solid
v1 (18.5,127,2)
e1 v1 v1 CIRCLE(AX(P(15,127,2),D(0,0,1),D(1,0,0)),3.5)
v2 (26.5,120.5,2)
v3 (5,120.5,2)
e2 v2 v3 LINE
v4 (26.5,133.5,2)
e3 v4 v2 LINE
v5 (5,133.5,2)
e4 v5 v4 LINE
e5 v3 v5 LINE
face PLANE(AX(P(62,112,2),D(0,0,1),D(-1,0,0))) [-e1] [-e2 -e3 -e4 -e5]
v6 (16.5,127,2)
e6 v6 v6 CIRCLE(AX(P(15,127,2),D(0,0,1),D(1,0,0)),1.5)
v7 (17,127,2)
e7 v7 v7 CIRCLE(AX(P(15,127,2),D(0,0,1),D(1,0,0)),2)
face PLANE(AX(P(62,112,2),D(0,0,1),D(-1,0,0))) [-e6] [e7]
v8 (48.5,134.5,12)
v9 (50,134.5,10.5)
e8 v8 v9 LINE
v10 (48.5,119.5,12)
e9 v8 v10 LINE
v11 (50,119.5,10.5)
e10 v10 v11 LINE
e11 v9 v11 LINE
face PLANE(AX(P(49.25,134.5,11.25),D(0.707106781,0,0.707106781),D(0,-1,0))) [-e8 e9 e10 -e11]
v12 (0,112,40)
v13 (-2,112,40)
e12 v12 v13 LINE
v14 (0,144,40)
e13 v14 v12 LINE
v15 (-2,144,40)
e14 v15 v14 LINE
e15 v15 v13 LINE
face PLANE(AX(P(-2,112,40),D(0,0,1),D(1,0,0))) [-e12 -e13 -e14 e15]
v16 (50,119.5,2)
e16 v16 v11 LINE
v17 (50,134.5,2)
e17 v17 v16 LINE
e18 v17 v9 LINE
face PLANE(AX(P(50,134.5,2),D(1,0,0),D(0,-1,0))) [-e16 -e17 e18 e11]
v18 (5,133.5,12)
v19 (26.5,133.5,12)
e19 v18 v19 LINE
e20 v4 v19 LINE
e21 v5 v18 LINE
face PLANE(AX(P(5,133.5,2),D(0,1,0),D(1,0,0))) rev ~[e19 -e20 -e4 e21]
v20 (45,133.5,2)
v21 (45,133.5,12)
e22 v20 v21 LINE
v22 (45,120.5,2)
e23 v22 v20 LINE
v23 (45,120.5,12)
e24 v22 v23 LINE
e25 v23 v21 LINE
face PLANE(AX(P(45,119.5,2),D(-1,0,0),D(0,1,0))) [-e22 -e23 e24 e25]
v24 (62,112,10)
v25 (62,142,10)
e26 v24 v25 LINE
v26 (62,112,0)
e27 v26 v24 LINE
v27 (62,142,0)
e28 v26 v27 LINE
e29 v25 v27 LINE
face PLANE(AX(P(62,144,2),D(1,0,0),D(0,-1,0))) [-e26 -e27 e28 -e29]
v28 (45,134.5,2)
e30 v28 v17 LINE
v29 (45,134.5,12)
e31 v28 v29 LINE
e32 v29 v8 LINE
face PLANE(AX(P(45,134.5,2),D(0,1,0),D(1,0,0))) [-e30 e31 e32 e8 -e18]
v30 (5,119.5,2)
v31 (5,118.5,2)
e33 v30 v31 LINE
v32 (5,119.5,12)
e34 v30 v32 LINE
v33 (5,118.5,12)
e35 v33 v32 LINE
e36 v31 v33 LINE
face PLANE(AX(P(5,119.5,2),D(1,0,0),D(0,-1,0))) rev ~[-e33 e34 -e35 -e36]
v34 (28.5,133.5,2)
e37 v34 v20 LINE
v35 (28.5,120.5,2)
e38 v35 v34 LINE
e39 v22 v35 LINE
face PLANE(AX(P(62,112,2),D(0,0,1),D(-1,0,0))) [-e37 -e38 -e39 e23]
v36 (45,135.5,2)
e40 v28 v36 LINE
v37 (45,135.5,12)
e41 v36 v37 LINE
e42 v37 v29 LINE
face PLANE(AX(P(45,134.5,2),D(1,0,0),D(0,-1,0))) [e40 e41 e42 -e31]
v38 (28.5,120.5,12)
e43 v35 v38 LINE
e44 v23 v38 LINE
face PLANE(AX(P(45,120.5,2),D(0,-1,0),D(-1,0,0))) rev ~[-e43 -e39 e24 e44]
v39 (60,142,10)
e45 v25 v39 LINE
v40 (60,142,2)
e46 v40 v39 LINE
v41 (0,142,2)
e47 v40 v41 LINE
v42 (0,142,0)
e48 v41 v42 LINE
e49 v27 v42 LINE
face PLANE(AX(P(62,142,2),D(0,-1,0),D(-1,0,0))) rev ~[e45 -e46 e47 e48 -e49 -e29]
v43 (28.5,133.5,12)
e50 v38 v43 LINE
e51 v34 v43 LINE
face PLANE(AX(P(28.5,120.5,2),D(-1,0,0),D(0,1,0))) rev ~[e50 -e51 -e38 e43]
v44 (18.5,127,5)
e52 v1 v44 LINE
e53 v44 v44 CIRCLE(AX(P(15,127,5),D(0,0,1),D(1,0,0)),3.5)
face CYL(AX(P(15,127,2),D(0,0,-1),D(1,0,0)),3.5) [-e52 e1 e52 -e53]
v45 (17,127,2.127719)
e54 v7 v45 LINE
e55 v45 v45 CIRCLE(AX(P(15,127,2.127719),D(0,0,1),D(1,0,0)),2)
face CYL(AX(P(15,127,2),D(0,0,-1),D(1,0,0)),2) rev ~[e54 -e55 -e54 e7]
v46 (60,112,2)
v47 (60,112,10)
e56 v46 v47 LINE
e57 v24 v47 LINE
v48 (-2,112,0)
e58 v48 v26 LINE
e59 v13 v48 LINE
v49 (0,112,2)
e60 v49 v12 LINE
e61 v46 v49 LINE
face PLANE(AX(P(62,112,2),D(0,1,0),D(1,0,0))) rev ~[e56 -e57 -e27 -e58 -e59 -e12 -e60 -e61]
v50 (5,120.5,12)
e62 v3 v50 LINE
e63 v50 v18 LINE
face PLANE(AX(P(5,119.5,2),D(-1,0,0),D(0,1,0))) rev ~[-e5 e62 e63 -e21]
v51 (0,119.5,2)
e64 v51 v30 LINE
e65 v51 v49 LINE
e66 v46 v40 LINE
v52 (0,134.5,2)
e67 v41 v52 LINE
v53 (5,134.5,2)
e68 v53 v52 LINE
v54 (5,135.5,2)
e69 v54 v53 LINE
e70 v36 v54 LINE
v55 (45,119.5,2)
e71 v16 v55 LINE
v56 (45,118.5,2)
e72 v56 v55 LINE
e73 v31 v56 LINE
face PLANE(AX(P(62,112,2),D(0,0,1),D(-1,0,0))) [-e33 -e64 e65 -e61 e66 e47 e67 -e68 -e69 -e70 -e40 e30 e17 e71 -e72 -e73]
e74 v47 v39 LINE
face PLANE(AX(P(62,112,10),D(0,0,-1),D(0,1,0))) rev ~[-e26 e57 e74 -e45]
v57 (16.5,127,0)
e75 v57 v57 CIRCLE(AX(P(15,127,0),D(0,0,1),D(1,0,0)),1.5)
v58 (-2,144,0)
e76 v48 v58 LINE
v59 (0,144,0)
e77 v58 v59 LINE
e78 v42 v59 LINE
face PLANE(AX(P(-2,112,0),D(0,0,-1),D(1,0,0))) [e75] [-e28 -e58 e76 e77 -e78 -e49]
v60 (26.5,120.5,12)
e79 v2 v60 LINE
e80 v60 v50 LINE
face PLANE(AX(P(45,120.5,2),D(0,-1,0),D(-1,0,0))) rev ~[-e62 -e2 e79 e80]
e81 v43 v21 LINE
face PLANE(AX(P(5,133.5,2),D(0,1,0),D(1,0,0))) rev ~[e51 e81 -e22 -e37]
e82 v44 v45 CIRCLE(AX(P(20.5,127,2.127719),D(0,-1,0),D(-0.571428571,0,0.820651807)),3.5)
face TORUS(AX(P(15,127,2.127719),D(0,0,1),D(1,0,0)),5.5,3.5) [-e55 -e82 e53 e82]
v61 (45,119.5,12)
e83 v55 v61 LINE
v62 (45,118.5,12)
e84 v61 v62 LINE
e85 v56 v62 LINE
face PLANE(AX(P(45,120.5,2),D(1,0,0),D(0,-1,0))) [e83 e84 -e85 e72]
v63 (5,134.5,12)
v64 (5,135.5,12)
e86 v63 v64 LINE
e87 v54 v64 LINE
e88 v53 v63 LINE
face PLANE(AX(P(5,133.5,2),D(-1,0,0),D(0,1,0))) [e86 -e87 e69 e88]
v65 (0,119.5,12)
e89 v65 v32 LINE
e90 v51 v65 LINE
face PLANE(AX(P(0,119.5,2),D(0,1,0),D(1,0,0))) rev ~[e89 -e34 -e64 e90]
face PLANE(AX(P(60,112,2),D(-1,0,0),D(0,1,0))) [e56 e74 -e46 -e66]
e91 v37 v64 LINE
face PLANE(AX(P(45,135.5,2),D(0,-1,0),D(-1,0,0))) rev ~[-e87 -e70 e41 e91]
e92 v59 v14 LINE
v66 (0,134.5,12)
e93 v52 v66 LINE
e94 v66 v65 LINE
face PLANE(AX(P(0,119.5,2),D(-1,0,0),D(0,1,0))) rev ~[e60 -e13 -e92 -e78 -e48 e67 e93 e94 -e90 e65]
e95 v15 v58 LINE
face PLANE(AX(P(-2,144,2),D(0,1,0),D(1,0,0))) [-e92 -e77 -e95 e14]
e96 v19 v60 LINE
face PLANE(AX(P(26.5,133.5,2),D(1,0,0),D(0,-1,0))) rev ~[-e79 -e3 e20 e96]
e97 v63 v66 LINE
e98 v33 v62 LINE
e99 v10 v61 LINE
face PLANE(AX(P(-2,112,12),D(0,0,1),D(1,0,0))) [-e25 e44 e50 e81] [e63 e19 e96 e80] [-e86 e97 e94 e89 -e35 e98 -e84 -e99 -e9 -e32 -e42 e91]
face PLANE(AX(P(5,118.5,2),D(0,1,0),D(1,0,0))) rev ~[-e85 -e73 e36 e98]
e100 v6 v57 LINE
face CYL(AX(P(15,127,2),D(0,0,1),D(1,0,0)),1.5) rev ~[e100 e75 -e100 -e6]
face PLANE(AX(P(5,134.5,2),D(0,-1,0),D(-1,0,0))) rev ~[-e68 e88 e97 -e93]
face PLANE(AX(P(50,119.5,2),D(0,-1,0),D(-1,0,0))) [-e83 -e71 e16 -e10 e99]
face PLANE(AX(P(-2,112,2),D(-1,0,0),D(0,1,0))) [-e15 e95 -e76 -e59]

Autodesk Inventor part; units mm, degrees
ref_plane "YZ Plane" through (0, 0, 0) normal (1, 0, 0) x (0, 1, 0)
ref_plane "XZ Plane" through (0, 0, 0) normal (0, 1, 0) x (-1, 0, 0)
ref_plane "XY Plane" through (0, 0, 0) normal (0, 0, 1) x (1, 0, 0)
sketch "Esboço1" plane through (0, 0, 0) normal (0, 0, 1) x (1, 0, 0)
  line L0 (0, 0) -> (60, 0)
  line L1 (60, 0) -> (60, 110)
  line L2 (60, 110) -> (0, 110)
  line L3 (0, 110) -> (0, 0)
  line L4 (62, 112) -> (62, -2)
  line L5 (62, -2) -> (-2, -2)
  line L6 (-2, -2) -> (-2, 112)
  line L7 (-2, 112) -> (62, 112)
  dimension "d0" = 60
  dimension "d1" = 110
  dimension "d2" = 2
extrude "Extrusão1" add sketch "Esboço1" along normal blind 2 contours L3 L2 L1 L0 | L4 L5 L6 L7
sketch "Esboço2" plane through (0, 0, 2) normal (0, 0, 1) x (1, 0, 0)
  line L0 (62, 112) -> (-2, 112) projected
  line L1 (-2, 112) -> (-2, -2) projected
  line L2 (62, -2) -> (62, 112) projected
  line L3 (-2, -2) -> (62, -2) projected
  line L4 (0, 0) -> (0, 110)
  line L5 (0, 110) -> (60, 110)
  line L6 (60, 110) -> (60, 0)
  line L7 (60, 0) -> (0, 0)
  point P0 (0, 0)
  dimension "d5" = 2
extrude "Extrusão2" add sketch "Esboço2" along normal blind 38
sketch "Esboço3" plane through (-2, -2, 0) normal (0, -1, 0) x (1, 0, 0)
  line L0 (32, 5) -> (42, 5)
  line L1 (42, 5) -> (42, 15)
  line L2 (42, 15) -> (32, 15)
  line L3 (32, 15) -> (32, 5)
  line L4 (0, 0) -> (64, 0) projected
  line L5 (64, 0) -> (64, 40) projected
  point P0 (2, 0)
  dimension "d8" = 10
  dimension "d9" = 10
  dimension "d10" = 5
  dimension "d11" = 22
extrude "Extrusão3" cut sketch "Esboço3" against normal blind 38
sketch "Esboço11" plane through (-2, 112, 0) normal (0, 1, 0) x (1, 0, 0)
  line L0 (64, 0) -> (64, -40) projected
  line L1 (0, 0) -> (64, 0)
  line L2 (64, 0) -> (64, -2)
  line L3 (64, -2) -> (0, -2)
  line L4 (0, -2) -> (0, 0)
  line L5 (64, 0) -> (0, 0) projected
  point P0 (2, 0)
  dimension "d45" = 2
  dimension "d46" = 0
  dimension "d47" = 64
extrude "Extrusão8" add sketch "Esboço11" along normal blind 32
sketch "Esboço12" plane through (-2, 112, 2) normal (0, 0, 1) x (1, 0, 0)
  line L0 (2, 7.5) -> (7, 7.5)
  line L1 (7, 7.5) -> (7, 22.5)
  line L2 (7, 22.5) -> (2, 22.5)
  line L3 (2, 22.5) -> (2, 7.5)
  line L4 (52, 7.5) -> (47, 7.5)
  line L5 (47, 7.5) -> (47, 22.5)
  line L6 (47, 22.5) -> (52, 22.5)
  line L7 (52, 22.5) -> (52, 7.5)
  line L8 (64, 0) -> (0, 0) projected
  line L9 (0, 0) -> (0, 32) projected
  point P0 (2, -112)
  dimension "d50" = 5
  dimension "d51" = 15
  dimension "d52" = 5
  dimension "d53" = 15
  dimension "d54" = 7.5
  dimension "d55" = 7.5
  dimension "d56" = 40
  dimension "d57" = 2
extrude "Extrusão9" add sketch "Esboço12" along normal blind 10
sketch "Esboço13" plane through (-2, 112, 2) normal (0, 0, 1) x (1, 0, 0)
  circle A0 centre (17, 15) radius 1.5
  circle A1 centre (17, 15) radius 2
  circle A2 centre (17, 15) radius 3.5
  line L0 (7, 7.5) -> (7, 22.5) projected
  line L1 (0, 32) -> (64, 32) projected
  point P0 (2, -112)
  dimension "d60" = 3
  dimension "d61" = 4
  dimension "d62" = 7
  dimension "d69" = 10
  dimension "d70" = 17
extrude "Extrusão10" add sketch "Esboço13" along normal blind 3 contours A2
fillet "Arredondamento1" radius 3.5 1 edges at (13, 127, 5)
sketch "Esboço14" plane through (15, 127, 2) normal (0, 0, 1) x (1, 0, 0)
  circle A0 centre (0, 0) radius 1.5
  point P0 (-15, -127)
  dimension "d66" = 3
extrude "Extrusão11" cut sketch "Esboço14" against normal blind 3
sketch "Esboço16" plane through (-2, 112, 2) normal (0, 0, 1) x (1, 0, 0)
  line L0 (47, 22.5) -> (47, 7.5) projected
  line L1 (7, 6.5) -> (47, 6.5)
  line L2 (47, 6.5) -> (47, 8.5)
  line L3 (47, 8.5) -> (7, 8.5)
  line L4 (7, 8.5) -> (7, 6.5)
  line L5 (7, 7.5) -> (7, 22.5) projected
  line L6 (47, 23.5) -> (7, 23.5)
  line L7 (7, 23.5) -> (7, 21.5)
  line L8 (7, 21.5) -> (47, 21.5)
  line L9 (47, 21.5) -> (47, 23.5)
  circle A0 centre (17, 15) radius 1.5 projected
  point P0 (2, -112)
  point P1 (47, 21.5)
  dimension "d77" = 2
  dimension "d78" = 2
  dimension "d79" = 13
  dimension "d80" = 6.5
  dimension "d81" = 40
extrude "Extrusão13" add sketch "Esboço16" along normal blind 10 contours L0 L8 L5 L7 L6 L9 | L0 L2 L1 L4 L3
sketch "Esboço17" plane through (5, 133.5, 2) normal (0, 0, 1) x (1, 0, 0)
  line L0 (0, 0) -> (40, 0) projected
  line L1 (23.5, 0) -> (21.5, 0)
  line L2 (21.5, 0) -> (21.5, -13)
  line L3 (21.5, -13) -> (23.5, -13)
  line L4 (23.5, -13) -> (23.5, 0)
  line L5 (40, -13) -> (0, -13) projected
  circle A0 centre (10, -6.5) radius 1.5 projected
  point P0 (-5, -133.5)
  point P1 (21.5, 0)
  dimension "d84" = 0
  dimension "d85" = 2
  dimension "d86" = 10
extrude "Extrusão14" add sketch "Esboço17" along normal blind 10 contours L0 L4 L3 L2
sketch "Esboço18" plane through (-2, 112, 2) normal (0, 0, 1) x (1, 0, 0)
  line L0 (30.5, 21.5) -> (30.5, 8.5) projected
  line L1 (30.5, 8.5) -> (47, 8.5) projected
  line L2 (47, 8.5) -> (47, 21.5) projected
  line L3 (47, 21.5) -> (30.5, 21.5) projected
  line L4 (28.5, 8.5) -> (28.5, 21.5) projected
  line L5 (28.5, 21.5) -> (7, 21.5) projected
  line L6 (7, 21.5) -> (7, 8.5) projected
  line L7 (7, 8.5) -> (28.5, 8.5) projected
  circle A0 centre (17, 15) radius 1.5 projected
  circle A1 centre (17, 15) radius 2 projected
  circle A2 centre (17, 15) radius 3.5 projected
  line L8 (52, 22.5) -> (52, 7.5) projected
  line L9 (52, 7.5) -> (47, 7.5) projected
  line L10 (47, 7.5) -> (47, 6.5) projected
  line L11 (47, 6.5) -> (7, 6.5) projected
  line L12 (7, 6.5) -> (7, 7.5) projected
  line L13 (7, 7.5) -> (2, 7.5) projected
  line L14 (2, 7.5) -> (2, 22.5) projected
  line L15 (2, 22.5) -> (7, 22.5) projected
  line L16 (7, 22.5) -> (7, 23.5) projected
  line L17 (7, 23.5) -> (47, 23.5) projected
  line L18 (47, 23.5) -> (47, 22.5) projected
  line L19 (47, 22.5) -> (52, 22.5) projected
  line L20 (0, 0) -> (64, 0) projected
  line L21 (64, 32) -> (64, 0) projected
  line L22 (0, 32) -> (64, 32) projected
  line L23 (0, 0) -> (0, 32) projected
  line L24 (0, -114) -> (0, 0) projected
  line L25 (64, -114) -> (0, -114) projected
  line L26 (64, 0) -> (64, -114) projected
  line L27 (2, -112) -> (62, -112) projected
  line L28 (62, -112) -> (62, -2) projected
  line L29 (62, -2) -> (2, -2) projected
  line L30 (2, -2) -> (2, -112) projected
  line L31 (62, 0) -> (62, 30)
  line L32 (62, 30) -> (2, 30)
  line L33 (2, 30) -> (2, 0)
  point P0 (2, 7.5)
  dimension "d89" = 2
extrude "Extrusão15" add sketch "Esboço18" along normal blind 38 contours L14 L33 L20 L23 L22 L21 L31 L32
sketch "Esboço19" plane through (62, -2, 40) normal (1, 0, 0) x (0, 0, -1)
  line L0 (30, 144) -> (0, 144)
  line L1 (0, 144) -> (0, 114)
  line L2 (0, 114) -> (30, 114)
  line L3 (30, 114) -> (30, 144)
  line L4 (40, 0) -> (40, 146) projected
  line L5 (40, 146) -> (0, 146) projected
  line L6 (0, 0) -> (0, 146) projected
  point P0 (40, 2)
  dimension "d92" = 10
  dimension "d93" = 2
  dimension "d94" = 0
  dimension "d95" = 30
extrude "Extrusão16" cut sketch "Esboço19" against normal blind 2
chamfer "Chanfro1" distance 1.5 angle 45 1 edges at (50, 127, 12)
sketch "Esboço20" plane through (-2, -2, 0) normal (-1, 0, 0) x (0, 0, 1)
  line L0 (25, 86) -> (15, 86)
  line L1 (15, 86) -> (15, 96)
  line L2 (15, 96) -> (25, 96)
  line L3 (25, 96) -> (25, 86)
  line L4 (0, 146) -> (40, 146) projected
  line L5 (0, 146) -> (0, 0) projected
  point P0 (0, 2)
  dimension "d101" = 10
  dimension "d102" = 10
  dimension "d103" = 50
  dimension "d104" = 15
extrude "Extrusão17" cut sketch "Esboço20" against normal blind 2
sketch "Esboço21" plane through (0, 0, 2) normal (0, 0, 1) x (1, 0, 0)
  point P0 (0, 0)
sketch "Esboço22" plane through (0, 0, 2) normal (0, 0, 1) x (1, 0, 0)
  line L0 (110.309, -33.0792) -> (-25.5735, -33.0792)
  line L1 (-25.5735, -33.0792) -> (-25.5735, 112)
  line L2 (-25.5735, 112) -> (110.309, 112)
  line L3 (110.309, 112) -> (110.309, -33.0792)
  line L4 (62, 112) -> (0, 112) projected
  point P0 (0, 0)
  dimension "d107" = 0
extrude "Extrusão18" cut sketch "Esboço22" along normal mid plane 100
sketch "Esboço23" plane through (50, 119.5, 2) normal (0, 0, 1) x (1, 0, 0)
  line L0 (12, 24.5) -> (-52, 24.5) projected
  line L1 (12, 22.5) -> (-50, 22.5)
  line L2 (-50, 22.5) -> (-50, 24.5)
  line L3 (-50, 24.5) -> (12, 24.5)
  line L4 (12, 24.5) -> (12, 22.5)
  point P0 (-50, -119.5)
extrude "Extrusão19" cut sketch "Esboço23" along normal mid plane 100
properties part number "basecaixa"
